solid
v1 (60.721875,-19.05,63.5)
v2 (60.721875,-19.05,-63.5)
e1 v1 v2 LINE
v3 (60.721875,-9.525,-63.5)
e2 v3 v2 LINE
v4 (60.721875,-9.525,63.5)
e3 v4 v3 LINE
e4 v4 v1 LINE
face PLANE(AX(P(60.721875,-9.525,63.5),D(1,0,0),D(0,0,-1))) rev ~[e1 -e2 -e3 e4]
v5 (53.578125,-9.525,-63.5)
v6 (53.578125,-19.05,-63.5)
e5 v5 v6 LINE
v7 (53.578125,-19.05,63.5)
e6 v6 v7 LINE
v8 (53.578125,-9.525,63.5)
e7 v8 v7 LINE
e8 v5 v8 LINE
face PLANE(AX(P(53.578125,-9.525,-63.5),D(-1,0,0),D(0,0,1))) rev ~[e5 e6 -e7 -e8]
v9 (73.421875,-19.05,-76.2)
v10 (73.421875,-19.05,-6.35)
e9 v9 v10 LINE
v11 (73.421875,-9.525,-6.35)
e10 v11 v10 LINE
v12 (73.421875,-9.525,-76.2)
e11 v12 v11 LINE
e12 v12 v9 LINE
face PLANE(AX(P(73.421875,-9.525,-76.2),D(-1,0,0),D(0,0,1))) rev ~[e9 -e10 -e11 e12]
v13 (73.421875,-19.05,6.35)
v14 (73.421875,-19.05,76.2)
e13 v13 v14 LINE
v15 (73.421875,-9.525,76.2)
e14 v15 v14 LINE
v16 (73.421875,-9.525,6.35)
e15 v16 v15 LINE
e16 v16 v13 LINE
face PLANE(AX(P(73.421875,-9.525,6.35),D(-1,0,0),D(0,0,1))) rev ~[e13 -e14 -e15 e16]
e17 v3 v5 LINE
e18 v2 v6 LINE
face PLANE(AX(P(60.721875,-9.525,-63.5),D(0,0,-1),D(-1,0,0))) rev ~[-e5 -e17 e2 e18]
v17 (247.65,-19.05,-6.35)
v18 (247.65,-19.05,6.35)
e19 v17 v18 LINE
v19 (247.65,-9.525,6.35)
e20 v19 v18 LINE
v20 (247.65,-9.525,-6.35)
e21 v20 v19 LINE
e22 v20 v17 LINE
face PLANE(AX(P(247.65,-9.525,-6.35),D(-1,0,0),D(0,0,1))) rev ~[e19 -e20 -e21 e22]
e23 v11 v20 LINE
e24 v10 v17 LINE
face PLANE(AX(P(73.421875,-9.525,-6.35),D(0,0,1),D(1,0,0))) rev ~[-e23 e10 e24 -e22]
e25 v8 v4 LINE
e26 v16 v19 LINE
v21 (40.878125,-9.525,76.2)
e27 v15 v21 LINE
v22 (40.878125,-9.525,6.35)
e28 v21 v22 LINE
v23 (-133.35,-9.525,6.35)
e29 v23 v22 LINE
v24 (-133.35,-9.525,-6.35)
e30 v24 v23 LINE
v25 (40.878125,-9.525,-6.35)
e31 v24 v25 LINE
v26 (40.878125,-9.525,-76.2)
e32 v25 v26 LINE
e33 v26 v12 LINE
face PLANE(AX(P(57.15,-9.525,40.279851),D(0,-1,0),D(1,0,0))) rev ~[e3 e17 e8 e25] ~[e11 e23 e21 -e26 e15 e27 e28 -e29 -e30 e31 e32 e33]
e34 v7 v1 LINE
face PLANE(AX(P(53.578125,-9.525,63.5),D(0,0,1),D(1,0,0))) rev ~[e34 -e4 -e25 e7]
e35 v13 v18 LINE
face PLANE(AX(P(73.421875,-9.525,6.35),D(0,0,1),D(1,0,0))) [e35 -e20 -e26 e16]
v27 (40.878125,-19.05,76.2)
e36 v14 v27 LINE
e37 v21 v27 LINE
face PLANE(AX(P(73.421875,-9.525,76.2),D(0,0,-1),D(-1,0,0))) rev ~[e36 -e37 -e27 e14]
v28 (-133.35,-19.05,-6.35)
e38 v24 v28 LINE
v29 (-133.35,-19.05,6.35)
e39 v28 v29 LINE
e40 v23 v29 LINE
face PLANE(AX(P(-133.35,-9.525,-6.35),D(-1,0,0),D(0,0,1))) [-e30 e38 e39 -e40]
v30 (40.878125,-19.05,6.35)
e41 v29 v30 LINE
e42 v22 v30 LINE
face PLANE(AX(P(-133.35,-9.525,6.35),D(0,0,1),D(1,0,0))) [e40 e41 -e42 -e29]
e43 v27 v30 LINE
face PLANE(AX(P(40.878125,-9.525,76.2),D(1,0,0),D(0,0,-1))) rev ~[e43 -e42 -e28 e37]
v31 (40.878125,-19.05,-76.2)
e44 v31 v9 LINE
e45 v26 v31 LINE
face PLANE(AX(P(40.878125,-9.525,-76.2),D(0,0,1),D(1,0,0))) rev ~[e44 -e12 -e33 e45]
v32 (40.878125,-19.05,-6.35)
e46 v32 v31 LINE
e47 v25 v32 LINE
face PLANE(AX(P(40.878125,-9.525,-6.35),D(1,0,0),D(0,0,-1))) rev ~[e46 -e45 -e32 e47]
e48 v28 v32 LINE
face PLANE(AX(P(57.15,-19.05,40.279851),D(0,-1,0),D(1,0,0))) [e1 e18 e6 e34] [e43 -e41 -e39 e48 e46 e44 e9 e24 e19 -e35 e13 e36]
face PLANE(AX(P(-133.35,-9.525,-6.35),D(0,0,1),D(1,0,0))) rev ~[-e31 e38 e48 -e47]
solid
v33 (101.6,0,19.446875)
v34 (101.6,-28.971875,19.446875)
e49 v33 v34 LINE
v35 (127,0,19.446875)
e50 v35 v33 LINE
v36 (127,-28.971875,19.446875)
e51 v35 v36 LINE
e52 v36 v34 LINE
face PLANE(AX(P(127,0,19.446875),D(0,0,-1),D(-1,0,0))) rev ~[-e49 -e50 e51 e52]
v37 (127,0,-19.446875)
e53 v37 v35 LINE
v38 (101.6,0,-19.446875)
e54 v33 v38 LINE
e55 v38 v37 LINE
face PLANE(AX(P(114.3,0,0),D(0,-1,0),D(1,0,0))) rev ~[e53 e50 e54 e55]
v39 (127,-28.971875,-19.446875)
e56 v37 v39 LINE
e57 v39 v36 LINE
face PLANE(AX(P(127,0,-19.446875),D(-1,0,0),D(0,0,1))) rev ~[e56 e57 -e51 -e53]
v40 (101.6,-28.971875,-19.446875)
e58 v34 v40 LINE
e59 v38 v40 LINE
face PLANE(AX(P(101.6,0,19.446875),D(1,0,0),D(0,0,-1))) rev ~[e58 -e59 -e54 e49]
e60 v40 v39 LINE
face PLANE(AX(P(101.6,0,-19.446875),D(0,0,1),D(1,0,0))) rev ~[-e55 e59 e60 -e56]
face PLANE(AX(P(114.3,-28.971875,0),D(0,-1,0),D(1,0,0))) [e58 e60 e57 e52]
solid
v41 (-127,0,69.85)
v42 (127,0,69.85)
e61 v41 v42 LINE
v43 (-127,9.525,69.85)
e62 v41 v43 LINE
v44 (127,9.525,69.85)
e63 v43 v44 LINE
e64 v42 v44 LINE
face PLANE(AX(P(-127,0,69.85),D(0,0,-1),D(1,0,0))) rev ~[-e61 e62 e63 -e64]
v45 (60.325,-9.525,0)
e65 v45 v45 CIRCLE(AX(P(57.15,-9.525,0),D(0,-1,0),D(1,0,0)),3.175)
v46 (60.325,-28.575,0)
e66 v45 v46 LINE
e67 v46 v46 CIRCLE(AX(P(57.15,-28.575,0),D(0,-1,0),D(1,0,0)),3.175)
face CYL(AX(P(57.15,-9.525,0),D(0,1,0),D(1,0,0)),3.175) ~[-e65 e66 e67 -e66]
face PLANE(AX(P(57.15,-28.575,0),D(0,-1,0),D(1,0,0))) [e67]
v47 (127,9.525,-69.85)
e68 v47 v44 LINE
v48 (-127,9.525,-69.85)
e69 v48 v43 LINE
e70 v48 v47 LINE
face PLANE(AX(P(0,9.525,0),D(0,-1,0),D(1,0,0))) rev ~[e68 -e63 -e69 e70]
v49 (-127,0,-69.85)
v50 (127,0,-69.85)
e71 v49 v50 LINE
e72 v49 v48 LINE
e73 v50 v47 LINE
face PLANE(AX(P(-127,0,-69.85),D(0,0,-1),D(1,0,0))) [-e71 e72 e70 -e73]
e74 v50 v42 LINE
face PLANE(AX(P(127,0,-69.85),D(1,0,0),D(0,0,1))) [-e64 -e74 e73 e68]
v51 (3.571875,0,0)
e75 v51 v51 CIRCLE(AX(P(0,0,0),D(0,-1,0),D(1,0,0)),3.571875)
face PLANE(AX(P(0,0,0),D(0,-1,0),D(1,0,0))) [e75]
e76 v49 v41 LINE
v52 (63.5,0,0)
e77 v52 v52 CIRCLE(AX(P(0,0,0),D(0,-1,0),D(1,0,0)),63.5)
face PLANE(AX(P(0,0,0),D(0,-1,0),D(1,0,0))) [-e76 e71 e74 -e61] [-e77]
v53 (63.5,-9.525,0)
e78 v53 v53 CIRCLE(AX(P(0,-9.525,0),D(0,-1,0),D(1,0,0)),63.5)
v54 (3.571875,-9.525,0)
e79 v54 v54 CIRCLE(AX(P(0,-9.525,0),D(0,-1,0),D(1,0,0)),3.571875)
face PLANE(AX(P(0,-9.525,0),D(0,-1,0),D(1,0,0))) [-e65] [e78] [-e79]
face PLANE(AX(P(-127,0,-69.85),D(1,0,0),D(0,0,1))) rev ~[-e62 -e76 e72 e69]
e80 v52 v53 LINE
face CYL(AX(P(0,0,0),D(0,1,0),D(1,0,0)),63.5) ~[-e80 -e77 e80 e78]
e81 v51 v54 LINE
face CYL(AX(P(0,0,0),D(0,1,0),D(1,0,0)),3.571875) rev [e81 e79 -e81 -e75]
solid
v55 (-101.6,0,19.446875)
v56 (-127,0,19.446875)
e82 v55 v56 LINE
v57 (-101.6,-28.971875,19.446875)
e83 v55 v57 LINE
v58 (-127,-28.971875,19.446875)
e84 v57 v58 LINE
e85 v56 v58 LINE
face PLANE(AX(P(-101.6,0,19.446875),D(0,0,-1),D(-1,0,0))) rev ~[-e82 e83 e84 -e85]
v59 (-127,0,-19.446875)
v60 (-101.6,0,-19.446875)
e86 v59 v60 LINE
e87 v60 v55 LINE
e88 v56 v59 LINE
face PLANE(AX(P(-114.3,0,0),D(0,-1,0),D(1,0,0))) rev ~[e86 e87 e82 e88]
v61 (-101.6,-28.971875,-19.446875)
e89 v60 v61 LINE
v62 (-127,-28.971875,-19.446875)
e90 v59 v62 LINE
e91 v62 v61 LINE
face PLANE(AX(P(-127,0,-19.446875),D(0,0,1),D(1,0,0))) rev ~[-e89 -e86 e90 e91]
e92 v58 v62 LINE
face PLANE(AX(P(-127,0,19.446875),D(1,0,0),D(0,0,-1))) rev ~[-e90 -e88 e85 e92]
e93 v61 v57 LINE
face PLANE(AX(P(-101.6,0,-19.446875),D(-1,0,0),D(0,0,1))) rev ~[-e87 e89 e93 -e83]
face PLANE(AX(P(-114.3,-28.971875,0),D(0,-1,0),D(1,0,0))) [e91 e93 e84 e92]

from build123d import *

# Parameters (mm, degrees)
F2_R      = 63.5
F2_R_2    = 3.571875
F3_DEPTH  = 9.525
F4_R      = 3.175
F5_DEPTH  = 19.05
F6_W      = 12.7
F6_H      = 12.7
F6_W_2    = 174.228125
F7_DEPTH  = 9.525
F8_W      = 254
F8_H      = 139.7
F9_DEPTH  = 9.525
F11_DEPTH = 28.971875


# Not quite as in the source:
# - a length typed as a fraction of an inch, garbled in the dataset ("3 / 203.2 mm" for 3/8 in), is restored


with BuildPart() as f3:
    # F2 (on Front) → F3 (new body)
    with BuildSketch(Plane.XZ):
        Circle(F2_R)
        Circle(F2_R_2, mode=Mode.SUBTRACT)
    extrude(amount=F3_DEPTH)

    # F4 (on face) → F5 (join)
    with BuildSketch(Plane.XZ.offset(9.525)):
        with Locations((57.15, 0)):
            Circle(F4_R)
    extrude(amount=F5_DEPTH)

    # F8 (on Front) → F9 (join)
    with BuildSketch(Plane.XZ):
        Rectangle(F8_W, F8_H)
    extrude(amount=-F9_DEPTH)


with BuildPart() as f7:
    # F6 (on face) → F7 (new body)
    with BuildSketch(Plane.XZ.offset(9.525)):
        Polygon((53.578125, 63.5), (60.721875, 63.5), (60.721875, 6.35), (73.421875, 6.35), (73.421875, 76.2), (40.878125, 76.2), (40.878125, 6.35), (53.578125, 6.35), align=None)
        with Locations((67.071875, 0)):
            Rectangle(F6_W, F6_H)
        with Locations((47.228125, 0)):
            Rectangle(F6_W, F6_H)
        Polygon((73.421875, -6.35), (60.721875, -6.35), (60.721875, -63.5), (53.578125, -63.5), (53.578125, -6.35), (40.878125, -6.35), (40.878125, -76.2), (73.421875, -76.2), align=None)
        with Locations((160.5359375, 0)):
            Rectangle(F6_W_2, F6_H)
        with Locations((-46.2359375, 0)):
            Rectangle(F6_W_2, F6_H)
    extrude(amount=F7_DEPTH)


with BuildPart() as f11:
    # F10 (on face) → F11 (new body)
    with BuildSketch(Plane.XZ):
        Polygon((-127, 19.446875), (-127, 0), (-127, -19.446875), (-101.6, -19.446875), (-101.6, 19.446875), align=None)
    extrude(amount=F11_DEPTH)


with BuildPart() as f11b:
    # F10 (on face) → F11, piece 2 (new body)
    with BuildSketch(Plane.XZ):
        Polygon((127, 0), (127, 19.446875), (101.6, 19.446875), (101.6, -19.446875), (127, -19.446875), align=None)
    extrude(amount=F11_DEPTH)


solid = Compound([f3.part, f7.part, f11.part, f11b.part])
